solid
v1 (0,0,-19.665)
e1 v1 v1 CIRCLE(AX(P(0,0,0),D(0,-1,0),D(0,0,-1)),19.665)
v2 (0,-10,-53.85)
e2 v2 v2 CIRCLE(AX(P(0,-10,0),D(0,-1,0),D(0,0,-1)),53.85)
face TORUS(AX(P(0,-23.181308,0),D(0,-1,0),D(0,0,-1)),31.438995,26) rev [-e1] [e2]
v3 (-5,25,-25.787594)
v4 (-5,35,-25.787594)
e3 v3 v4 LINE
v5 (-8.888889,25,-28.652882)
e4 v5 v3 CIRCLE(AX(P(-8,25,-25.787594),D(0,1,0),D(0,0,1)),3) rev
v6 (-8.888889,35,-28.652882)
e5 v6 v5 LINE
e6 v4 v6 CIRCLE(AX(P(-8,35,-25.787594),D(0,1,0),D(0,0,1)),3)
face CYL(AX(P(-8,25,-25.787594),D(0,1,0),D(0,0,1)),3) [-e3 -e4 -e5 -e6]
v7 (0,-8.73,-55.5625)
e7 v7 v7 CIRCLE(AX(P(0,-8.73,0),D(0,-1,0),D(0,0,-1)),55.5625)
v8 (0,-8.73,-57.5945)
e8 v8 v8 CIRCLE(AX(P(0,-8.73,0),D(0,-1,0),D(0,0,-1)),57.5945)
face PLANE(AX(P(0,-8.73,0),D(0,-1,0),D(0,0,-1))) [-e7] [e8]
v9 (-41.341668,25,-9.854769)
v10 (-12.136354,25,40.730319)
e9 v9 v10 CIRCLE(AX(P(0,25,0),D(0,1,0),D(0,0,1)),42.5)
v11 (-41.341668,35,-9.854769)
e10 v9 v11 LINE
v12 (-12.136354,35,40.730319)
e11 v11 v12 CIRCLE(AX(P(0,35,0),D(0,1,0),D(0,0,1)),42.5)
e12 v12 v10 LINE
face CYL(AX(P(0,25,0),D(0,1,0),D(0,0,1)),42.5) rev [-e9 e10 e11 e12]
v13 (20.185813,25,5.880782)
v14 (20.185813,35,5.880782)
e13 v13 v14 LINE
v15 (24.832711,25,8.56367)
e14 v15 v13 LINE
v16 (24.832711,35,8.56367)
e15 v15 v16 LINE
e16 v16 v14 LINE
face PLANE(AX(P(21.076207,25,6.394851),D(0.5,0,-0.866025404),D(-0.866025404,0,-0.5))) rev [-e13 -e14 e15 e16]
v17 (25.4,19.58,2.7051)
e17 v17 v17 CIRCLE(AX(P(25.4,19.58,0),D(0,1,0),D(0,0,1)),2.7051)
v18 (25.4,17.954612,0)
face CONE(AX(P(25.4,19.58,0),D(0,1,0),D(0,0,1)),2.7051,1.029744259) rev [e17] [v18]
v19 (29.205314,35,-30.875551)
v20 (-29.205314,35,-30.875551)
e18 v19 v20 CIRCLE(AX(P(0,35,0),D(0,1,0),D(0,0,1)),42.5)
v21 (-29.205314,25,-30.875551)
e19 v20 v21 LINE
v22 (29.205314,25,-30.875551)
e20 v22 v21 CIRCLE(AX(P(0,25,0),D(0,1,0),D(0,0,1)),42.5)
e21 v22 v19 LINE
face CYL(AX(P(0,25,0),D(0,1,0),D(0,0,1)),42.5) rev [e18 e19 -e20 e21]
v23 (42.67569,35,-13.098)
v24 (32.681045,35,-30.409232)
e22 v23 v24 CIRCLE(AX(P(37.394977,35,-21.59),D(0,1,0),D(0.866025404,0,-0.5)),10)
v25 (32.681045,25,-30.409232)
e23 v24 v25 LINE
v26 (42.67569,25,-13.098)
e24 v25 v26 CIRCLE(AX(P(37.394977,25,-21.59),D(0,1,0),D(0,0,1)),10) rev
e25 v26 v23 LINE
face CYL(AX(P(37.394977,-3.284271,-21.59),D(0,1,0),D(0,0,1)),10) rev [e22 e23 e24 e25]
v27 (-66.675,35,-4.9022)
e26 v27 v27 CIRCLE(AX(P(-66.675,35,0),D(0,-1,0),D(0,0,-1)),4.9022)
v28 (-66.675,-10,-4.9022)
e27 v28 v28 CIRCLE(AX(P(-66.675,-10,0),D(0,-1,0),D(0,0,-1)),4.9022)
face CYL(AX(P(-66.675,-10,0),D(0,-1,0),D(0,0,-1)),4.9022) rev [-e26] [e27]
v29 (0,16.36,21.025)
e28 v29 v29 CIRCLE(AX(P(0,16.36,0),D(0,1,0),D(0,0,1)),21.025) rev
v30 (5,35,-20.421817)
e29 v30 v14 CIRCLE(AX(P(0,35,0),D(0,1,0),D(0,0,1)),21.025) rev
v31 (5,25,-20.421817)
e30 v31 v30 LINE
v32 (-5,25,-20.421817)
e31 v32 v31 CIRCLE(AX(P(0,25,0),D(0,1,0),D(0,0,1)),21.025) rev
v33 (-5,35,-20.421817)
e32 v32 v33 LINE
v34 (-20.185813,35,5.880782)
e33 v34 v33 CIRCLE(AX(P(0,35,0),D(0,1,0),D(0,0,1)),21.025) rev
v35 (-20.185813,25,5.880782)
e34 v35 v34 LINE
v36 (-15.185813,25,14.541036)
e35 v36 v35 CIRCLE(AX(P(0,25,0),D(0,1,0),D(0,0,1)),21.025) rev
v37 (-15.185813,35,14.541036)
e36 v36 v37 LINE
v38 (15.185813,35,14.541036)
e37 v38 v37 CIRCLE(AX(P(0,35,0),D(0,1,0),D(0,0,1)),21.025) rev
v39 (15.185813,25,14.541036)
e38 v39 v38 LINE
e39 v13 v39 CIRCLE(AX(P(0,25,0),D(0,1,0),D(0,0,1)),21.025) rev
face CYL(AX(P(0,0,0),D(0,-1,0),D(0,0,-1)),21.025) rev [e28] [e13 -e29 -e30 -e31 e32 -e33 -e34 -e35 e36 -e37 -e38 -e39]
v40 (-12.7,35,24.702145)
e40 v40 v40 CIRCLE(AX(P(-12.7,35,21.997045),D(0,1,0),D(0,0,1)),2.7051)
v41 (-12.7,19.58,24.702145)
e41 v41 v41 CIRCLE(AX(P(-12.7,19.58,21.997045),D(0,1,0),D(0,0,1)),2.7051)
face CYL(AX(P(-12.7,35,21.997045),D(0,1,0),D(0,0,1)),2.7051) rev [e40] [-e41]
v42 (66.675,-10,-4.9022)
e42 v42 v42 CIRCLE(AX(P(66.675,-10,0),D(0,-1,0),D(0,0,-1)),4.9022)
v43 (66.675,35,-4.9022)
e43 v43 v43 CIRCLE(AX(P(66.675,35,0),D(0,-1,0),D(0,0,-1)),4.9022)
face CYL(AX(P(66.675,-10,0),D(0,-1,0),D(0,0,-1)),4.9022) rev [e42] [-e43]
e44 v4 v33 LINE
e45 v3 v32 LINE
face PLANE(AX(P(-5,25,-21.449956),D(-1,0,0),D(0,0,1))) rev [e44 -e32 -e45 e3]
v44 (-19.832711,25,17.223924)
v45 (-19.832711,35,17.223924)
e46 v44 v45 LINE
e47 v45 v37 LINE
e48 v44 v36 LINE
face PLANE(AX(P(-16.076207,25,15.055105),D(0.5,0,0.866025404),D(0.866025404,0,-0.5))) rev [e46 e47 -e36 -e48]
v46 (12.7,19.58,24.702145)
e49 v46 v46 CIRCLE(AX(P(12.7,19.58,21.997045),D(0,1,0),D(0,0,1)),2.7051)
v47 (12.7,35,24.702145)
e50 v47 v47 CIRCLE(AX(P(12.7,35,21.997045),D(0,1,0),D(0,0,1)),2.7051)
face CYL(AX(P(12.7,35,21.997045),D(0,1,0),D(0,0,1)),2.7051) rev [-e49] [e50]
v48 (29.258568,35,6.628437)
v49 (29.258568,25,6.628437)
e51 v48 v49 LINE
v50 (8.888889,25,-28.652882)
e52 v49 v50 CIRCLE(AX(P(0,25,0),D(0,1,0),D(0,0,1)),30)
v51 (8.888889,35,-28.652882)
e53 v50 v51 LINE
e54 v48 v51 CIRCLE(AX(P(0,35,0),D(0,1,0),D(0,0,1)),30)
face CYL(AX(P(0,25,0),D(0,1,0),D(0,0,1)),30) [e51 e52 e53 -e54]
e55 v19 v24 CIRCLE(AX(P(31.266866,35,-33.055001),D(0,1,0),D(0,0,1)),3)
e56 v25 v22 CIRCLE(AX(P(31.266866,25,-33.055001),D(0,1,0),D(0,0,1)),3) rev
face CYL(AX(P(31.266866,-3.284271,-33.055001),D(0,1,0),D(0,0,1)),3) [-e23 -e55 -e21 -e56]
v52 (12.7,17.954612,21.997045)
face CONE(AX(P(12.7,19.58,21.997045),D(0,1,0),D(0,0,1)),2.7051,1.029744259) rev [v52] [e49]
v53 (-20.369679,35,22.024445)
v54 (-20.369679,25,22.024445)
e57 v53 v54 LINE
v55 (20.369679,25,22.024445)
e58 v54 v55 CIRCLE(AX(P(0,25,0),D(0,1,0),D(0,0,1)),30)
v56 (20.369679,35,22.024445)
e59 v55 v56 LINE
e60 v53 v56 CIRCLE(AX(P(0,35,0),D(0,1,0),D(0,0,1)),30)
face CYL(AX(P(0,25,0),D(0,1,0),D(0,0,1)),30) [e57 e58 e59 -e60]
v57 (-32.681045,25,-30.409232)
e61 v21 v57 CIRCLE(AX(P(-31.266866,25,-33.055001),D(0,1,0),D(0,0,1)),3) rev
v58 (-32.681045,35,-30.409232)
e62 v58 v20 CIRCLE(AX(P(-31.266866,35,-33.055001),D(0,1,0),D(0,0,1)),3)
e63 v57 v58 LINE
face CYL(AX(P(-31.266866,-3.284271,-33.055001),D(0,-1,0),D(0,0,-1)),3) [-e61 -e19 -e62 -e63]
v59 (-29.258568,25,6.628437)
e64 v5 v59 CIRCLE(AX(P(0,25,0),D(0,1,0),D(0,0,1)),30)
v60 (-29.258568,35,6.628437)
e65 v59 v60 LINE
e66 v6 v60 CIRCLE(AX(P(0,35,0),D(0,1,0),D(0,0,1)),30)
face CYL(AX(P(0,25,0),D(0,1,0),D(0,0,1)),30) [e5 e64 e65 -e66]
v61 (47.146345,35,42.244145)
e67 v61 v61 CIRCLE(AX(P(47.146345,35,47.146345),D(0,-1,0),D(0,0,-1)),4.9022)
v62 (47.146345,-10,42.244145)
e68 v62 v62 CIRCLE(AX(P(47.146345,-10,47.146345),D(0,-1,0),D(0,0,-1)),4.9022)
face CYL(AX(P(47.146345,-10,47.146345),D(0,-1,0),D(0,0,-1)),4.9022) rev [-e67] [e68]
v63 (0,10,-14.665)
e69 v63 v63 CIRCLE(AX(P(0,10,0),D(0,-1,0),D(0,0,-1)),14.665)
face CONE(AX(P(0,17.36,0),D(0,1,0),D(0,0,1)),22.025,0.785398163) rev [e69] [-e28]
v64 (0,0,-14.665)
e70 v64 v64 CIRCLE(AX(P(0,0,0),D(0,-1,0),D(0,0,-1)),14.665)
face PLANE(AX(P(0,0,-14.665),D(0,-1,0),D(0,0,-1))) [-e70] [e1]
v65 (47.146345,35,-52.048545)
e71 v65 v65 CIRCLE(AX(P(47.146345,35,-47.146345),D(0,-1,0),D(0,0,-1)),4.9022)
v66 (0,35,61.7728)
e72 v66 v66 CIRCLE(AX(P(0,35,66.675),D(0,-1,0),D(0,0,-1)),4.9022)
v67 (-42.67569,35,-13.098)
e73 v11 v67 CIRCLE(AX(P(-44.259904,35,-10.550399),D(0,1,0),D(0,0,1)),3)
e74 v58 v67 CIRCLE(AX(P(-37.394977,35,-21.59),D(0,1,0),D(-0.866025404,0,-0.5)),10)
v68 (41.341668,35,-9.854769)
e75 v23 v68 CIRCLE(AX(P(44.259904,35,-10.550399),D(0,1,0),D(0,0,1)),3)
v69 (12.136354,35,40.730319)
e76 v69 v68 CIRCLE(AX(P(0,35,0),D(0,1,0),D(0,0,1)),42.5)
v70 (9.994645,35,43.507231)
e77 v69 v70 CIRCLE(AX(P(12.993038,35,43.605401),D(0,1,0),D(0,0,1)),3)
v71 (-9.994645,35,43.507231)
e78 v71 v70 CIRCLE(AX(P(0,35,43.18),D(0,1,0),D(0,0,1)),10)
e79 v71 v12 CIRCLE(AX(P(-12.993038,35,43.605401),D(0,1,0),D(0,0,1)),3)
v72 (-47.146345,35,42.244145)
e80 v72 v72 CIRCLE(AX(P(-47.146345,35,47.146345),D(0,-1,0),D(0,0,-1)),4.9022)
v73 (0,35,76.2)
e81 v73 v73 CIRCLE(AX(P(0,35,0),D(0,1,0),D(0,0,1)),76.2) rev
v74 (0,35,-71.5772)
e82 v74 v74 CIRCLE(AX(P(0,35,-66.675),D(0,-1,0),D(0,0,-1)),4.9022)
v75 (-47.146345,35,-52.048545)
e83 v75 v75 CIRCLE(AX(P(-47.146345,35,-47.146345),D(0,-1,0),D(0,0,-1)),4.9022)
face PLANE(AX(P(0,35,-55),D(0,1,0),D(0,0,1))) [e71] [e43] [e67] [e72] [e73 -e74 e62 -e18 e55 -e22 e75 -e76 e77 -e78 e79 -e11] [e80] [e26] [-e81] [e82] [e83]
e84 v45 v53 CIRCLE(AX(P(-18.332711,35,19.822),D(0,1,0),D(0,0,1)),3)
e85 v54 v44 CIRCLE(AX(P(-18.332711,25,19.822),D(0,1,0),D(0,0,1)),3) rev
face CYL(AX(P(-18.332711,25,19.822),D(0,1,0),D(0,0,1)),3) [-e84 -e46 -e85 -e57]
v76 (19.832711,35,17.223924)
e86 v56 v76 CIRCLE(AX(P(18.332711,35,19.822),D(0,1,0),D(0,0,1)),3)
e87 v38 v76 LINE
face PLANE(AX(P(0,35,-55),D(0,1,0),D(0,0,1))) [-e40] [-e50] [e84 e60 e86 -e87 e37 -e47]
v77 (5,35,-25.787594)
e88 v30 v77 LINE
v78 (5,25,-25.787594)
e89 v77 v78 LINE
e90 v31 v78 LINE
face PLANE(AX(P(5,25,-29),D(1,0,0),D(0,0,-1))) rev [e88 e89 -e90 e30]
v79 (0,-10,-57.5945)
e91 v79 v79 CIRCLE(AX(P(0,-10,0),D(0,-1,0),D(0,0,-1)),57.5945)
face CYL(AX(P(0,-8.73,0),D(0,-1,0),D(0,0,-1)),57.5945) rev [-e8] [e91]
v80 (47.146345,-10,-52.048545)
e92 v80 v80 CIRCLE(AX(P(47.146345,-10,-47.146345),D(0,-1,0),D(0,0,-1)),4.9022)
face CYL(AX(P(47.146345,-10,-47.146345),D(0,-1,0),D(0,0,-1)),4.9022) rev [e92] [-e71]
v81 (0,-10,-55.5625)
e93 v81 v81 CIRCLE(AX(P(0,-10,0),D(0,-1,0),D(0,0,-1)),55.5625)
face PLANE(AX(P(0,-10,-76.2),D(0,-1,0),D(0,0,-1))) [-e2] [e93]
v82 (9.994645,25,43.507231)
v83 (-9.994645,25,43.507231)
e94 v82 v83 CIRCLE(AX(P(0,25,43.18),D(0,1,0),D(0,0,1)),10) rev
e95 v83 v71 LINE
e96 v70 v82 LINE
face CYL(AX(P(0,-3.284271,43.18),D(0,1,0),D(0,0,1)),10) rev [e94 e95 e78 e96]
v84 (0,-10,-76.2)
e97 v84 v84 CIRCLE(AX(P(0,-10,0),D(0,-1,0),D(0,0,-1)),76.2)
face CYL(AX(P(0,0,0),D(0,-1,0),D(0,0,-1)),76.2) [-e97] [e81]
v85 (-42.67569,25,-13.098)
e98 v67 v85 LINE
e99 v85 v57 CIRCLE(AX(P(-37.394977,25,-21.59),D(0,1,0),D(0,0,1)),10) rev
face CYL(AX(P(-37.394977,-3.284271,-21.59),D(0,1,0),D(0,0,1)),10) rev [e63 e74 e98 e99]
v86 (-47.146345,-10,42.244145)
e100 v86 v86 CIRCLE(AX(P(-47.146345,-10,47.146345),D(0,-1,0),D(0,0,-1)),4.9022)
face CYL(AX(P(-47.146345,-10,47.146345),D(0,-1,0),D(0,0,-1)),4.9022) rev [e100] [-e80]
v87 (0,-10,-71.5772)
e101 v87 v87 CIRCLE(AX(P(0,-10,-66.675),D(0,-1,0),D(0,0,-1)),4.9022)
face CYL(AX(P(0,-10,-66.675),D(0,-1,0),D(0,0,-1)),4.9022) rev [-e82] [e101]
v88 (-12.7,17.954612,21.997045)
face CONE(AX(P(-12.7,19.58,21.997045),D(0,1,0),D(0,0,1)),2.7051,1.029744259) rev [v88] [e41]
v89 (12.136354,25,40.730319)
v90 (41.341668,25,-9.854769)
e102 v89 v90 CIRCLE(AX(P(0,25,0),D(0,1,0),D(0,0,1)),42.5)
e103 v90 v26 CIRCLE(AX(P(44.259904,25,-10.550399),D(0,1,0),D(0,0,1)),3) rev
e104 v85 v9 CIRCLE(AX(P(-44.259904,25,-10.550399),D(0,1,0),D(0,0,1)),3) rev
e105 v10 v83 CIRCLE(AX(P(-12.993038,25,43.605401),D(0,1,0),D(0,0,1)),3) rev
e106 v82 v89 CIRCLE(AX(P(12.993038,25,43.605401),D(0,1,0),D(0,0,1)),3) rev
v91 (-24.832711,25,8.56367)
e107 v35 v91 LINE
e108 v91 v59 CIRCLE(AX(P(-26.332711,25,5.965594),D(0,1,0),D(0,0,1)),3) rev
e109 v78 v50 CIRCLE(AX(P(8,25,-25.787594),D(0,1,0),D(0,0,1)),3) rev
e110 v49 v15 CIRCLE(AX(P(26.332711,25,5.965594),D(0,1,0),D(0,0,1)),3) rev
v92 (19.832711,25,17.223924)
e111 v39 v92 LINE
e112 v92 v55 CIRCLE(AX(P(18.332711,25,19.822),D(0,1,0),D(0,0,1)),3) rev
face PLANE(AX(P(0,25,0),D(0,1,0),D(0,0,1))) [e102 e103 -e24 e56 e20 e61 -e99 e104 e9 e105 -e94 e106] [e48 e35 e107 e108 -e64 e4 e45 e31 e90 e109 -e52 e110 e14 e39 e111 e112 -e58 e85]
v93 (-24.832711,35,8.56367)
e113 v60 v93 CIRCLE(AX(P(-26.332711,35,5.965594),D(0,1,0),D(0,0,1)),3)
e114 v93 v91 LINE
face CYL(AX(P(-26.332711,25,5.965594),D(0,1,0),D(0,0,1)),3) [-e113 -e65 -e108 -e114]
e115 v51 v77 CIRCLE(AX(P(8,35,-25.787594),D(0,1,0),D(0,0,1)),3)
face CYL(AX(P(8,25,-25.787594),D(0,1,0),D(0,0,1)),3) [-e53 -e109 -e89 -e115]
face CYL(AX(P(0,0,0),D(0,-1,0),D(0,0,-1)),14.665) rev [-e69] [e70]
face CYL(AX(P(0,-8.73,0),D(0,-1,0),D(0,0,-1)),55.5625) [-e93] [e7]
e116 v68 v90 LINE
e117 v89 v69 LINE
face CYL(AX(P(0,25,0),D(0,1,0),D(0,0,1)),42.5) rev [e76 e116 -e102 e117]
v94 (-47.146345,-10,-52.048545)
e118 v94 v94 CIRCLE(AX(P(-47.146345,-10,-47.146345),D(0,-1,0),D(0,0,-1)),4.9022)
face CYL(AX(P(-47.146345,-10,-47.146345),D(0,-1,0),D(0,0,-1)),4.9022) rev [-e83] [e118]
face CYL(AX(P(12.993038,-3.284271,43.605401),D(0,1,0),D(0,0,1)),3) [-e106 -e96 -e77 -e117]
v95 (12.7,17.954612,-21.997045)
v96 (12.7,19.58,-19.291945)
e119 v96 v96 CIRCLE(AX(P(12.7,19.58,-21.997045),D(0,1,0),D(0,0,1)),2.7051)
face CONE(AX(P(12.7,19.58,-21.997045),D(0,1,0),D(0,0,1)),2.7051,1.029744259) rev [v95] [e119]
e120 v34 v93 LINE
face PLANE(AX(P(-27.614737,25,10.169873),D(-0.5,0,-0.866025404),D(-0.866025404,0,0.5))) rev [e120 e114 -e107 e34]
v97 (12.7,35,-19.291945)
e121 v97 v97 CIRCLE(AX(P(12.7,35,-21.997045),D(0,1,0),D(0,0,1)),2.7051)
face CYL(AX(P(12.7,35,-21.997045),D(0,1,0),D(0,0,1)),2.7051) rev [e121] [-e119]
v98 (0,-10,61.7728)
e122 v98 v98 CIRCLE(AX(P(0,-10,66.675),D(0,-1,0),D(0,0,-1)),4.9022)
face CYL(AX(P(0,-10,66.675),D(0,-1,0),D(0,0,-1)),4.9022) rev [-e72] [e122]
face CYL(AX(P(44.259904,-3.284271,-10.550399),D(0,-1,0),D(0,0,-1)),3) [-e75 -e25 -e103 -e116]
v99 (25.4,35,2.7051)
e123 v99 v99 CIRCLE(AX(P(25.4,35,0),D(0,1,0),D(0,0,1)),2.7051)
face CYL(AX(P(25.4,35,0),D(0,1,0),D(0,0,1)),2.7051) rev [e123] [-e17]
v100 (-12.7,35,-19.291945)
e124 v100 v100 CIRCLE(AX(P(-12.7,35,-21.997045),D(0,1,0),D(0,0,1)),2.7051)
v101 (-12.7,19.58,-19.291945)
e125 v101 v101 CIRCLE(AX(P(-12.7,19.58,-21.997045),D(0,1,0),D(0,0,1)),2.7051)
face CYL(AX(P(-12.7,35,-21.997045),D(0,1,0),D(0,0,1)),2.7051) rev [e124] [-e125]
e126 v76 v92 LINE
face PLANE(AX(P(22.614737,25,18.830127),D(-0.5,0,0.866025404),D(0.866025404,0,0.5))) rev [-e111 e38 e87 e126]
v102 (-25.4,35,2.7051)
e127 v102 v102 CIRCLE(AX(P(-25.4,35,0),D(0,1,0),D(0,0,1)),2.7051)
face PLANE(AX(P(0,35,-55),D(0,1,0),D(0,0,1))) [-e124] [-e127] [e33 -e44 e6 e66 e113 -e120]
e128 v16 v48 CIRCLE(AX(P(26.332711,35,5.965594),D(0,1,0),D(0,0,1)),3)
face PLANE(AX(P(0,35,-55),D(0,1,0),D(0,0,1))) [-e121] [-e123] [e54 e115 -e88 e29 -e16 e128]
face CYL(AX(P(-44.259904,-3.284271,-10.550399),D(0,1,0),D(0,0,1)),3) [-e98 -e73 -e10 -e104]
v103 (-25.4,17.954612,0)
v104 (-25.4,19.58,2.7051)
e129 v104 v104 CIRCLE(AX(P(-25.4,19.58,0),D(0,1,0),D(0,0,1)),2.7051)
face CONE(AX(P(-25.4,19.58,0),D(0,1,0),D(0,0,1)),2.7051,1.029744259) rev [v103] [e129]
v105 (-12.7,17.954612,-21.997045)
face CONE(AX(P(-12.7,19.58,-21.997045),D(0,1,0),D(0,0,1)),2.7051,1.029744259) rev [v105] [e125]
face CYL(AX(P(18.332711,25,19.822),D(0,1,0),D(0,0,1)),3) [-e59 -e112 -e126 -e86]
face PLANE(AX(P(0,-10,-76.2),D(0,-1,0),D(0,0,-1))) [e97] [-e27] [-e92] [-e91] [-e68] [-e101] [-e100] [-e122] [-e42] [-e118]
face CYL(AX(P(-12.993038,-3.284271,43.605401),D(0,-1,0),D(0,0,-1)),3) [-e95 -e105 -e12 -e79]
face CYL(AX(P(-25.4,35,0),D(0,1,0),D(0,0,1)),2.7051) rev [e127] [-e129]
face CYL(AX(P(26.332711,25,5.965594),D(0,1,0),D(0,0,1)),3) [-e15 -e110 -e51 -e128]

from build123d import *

# Parameters (mm, degrees)
SKETCH6_R                   = 42.5
SKETCH6_R_2                 = 29
CUT_EXTRUDE3_DEPTH          = 10
CUT_EXTRUDE4_DEPTH          = 10
CIRPATTERN2_COUNT           = 3
DELETEFACE1_START           = 15
DELETEFACE1_OUTLINE_R       = 76.2
DELETEFACE1_OUTLINE_R_2     = 55
DELETEFACE1_DEPTH           = 20
F_3_8_CLEARANCE_HOLE1_D     = 9.8044
SKETCH46_R                  = 10.000000000000007
CUT_EXTRUDE5_DEPTH          = 10
CIRPATTERN6_COUNT           = 3
SKETCH54_R                  = 57.5945
SKETCH54_R_2                = 55.56250000000001
CUT_EXTRUDE6_DEPTH          = 1.27
MOVE_START                  = 16.3599999
MOVE_FACE1_DEPTH            = 18.6400001
MOVE_FACE1_2_DEPTH          = 8.6400001
F_1_4_28_TAPPED_HOLE1_D     = 5.4102
F_1_4_28_TAPPED_HOLE1_DEPTH = 15.42
F_1_4_28_TAPPED_HOLE1_TIP   = 1.6253880605314532
FILLET2_R                   = 3


# Read off the part's stored shape, not the designer's step: DeleteFace1, Move Face1
with BuildPart() as part:
    # Sketch3 → Revolve1 (revolve)
    with BuildSketch(Plane(origin=(0, 0, 0), x_dir=(0, 0, -1), z_dir=(1, 0, 0))):
        with BuildLine():
            Line((76.2, 15.000000000000002), (55, 14.999999999999998))
            Line((55, 14.999999999999998), (55, 34.99999999999999))
            Line((55, 34.99999999999999), (22.024999999999995, 34.99999999999999))
            Line((22.024999999999995, 34.99999999999999), (22.024999999999995, 17.360000000000028))
            Line((22.024999999999995, 17.360000000000028), (14.665, 10))
            Line((14.665, 10), (14.665, 0))
            Line((14.665, 0), (19.665, 0))
            ThreePointArc((19.665, 0), (38.73875508023388, 1.7729204917795123), (53.85, -10.000000000000004))
            Line((53.85, -10.000000000000004), (76.2, -10))
            Line((76.2, -10), (76.2, 15.000000000000002))
        make_face()
    revolve(axis=Axis((0, 0, 0), (0, 1, 0)))

    # Sketch6 → Cut-Extrude3 (cut)
    with BuildSketch(Plane(origin=(0, 34.99999999999999, 0), x_dir=(1, 0, 0), z_dir=(0, 1, 0))):
        with Locations(Location((0, 0, 0), (0, 0, 270))):
            Circle(SKETCH6_R)
        with Locations(Location((0, 0, 0), (0, 0, 270))):
            Circle(SKETCH6_R_2, mode=Mode.SUBTRACT)
    extrude(amount=-CUT_EXTRUDE3_DEPTH, mode=Mode.SUBTRACT)

    # Sketch7 → Cut-Extrude4 (cut)
    with BuildSketch(Plane(origin=(0, 34.99999999999999, 0), x_dir=(1, 0, 0), z_dir=(0, 1, 0))):
        Polygon((-4.999999999999999, 29), (5.000000000000001, 29.000000000000004), (5.000000000000005, 21.44995629366177), (-5, 21.449956293661767), align=None)
    cut_extrude4 = extrude(amount=-CUT_EXTRUDE4_DEPTH, mode=Mode.SUBTRACT)

    # CirPattern2: Cut-Extrude4 ×3 about axis
    cirpattern2_axis = Axis((2.9e-16, 0, 0), (0, 1, 0))
    for i in range(1, CIRPATTERN2_COUNT):
        add(cut_extrude4.rotate(cirpattern2_axis, i * 360 / CIRPATTERN2_COUNT), mode=Mode.SUBTRACT)

    # DeleteFace1 outline → DeleteFace1 (add)
    with BuildSketch(Plane(origin=(0, 0, 0), x_dir=(1, 0, 0), z_dir=(0, 1, 0)).offset(DELETEFACE1_START)):
        Circle(DELETEFACE1_OUTLINE_R)
        Circle(DELETEFACE1_OUTLINE_R_2, mode=Mode.SUBTRACT)
    extrude(amount=DELETEFACE1_DEPTH)

    # 3/8 Clearance Hole1 (through all)
    with Locations(Plane(origin=(0, -10.000000000000002, 0), x_dir=(-1, 0, 0), z_dir=(0, -1, 0))):
        with Locations((-47.146344636, 47.146344636), (-66.675, 0), (-47.146344636, -47.146344636), (0, -66.675), (47.146344636, -47.146344636), (66.675, 0), (47.146344636, 47.146344636), (0, 66.675)):
            Hole(F_3_8_CLEARANCE_HOLE1_D / 2)

    # Sketch46 → Cut-Extrude5 (cut)
    with BuildSketch(Plane(origin=(0, 34.99999999999999, 0), x_dir=(1, 0, 0), z_dir=(0, 1, 0))):
        with Locations((0, -43.17999999999999)):
            Circle(SKETCH46_R)
    cut_extrude5 = extrude(amount=-CUT_EXTRUDE5_DEPTH, mode=Mode.SUBTRACT)

    # CirPattern6: Cut-Extrude5 ×3 about axis
    cirpattern6_axis = Axis((2.97e-15, 0, -2.87e-15), (0, 1, 0))
    for i in range(1, CIRPATTERN6_COUNT):
        add(cut_extrude5.rotate(cirpattern6_axis, i * 360 / CIRPATTERN6_COUNT), mode=Mode.SUBTRACT)

    # Sketch54 → Cut-Extrude6 (cut)
    with BuildSketch(Plane.XZ.offset(10.000000000000002)):
        with Locations(Location((1.9421e-13, 2e-17, 0), (0, 0, 270))):
            Circle(SKETCH54_R)
        with Locations(Location((1.9421e-13, 2e-17, 0), (0, 0, 270))):
            Circle(SKETCH54_R_2, mode=Mode.SUBTRACT)
    extrude(amount=-CUT_EXTRUDE6_DEPTH, mode=Mode.SUBTRACT)

    # Move Face1 outline → Move Face1 (add)
    with BuildSketch(Plane(origin=(0, 0, 0), x_dir=(1, 0, 0), z_dir=(0, 1, 0)).offset(MOVE_START)):
        with BuildLine():
            Line((27.238633754, -9.952729838), (28.117376915, -10.460072439))
            ThreePointArc((28.117376915, -10.460072439), (25.980762114, 15), (5, 29.580398915))
            Line((5, 29.580398915), (5, 28.565713714))
            ThreePointArc((5, 28.565713714), (25.11473671, 14.5), (27.238633754, -9.952729838))
        make_face()
        with BuildLine():
            Line((20.18581264, -5.88078167), (21.07620706, -6.394851128))
            ThreePointArc((21.07620706, -6.394851128), (19.074209518, 11.0125), (5, 21.449956294))
            Line((5, 21.449956294), (5, 20.421817378))
            ThreePointArc((5, 20.421817378), (18.208184115, 10.5125), (20.18581264, -5.88078167))
        make_face()
        with BuildLine():
            ThreePointArc((-16.07620706, -15.055105166), (0, -22.025), (16.07620706, -15.055105166))
            Line((16.07620706, -15.055105166), (15.18581264, -14.541035708))
            ThreePointArc((15.18581264, -14.541035708), (0, -21.025), (-15.18581264, -14.541035708))
            Line((-15.18581264, -14.541035708), (-16.07620706, -15.055105166))
        make_face()
        with BuildLine():
            Line((-5, 20.421817378), (-5, 21.449956294))
            ThreePointArc((-5, 21.449956294), (-19.074209518, 11.0125), (-21.07620706, -6.394851128))
            Line((-21.07620706, -6.394851128), (-20.18581264, -5.88078167))
            ThreePointArc((-20.18581264, -5.88078167), (-18.208184115, 10.5125), (-5, 20.421817378))
        make_face()
        with BuildLine():
            Line((23.117376915, -19.120326477), (22.238633754, -18.612983876))
            ThreePointArc((22.238633754, -18.612983876), (0, -29), (-22.238633754, -18.612983876))
            Line((-22.238633754, -18.612983876), (-23.117376915, -19.120326477))
            ThreePointArc((-23.117376915, -19.120326477), (0, -30), (23.117376915, -19.120326477))
        make_face()
        with BuildLine():
            ThreePointArc((-27.238633754, -9.952729838), (-25.11473671, 14.5), (-5, 28.565713714))
            Line((-5, 28.565713714), (-5, 29.580398915))
            ThreePointArc((-5, 29.580398915), (-25.980762114, 15), (-28.117376915, -10.460072439))
            Line((-28.117376915, -10.460072439), (-27.238633754, -9.952729838))
        make_face()
    extrude(amount=MOVE_FACE1_DEPTH)

    # Move Face1 2 outline → Move Face1 2 (add)
    with BuildSketch(Plane(origin=(0, 0, 0), x_dir=(1, 0, 0), z_dir=(0, 1, 0)).offset(MOVE_START)):
        with BuildLine():
            ThreePointArc((16.07620706, -15.055105166), (19.074209518, -11.0125), (21.07620706, -6.394851128))
            Line((21.07620706, -6.394851128), (20.18581264, -5.88078167))
            ThreePointArc((20.18581264, -5.88078167), (18.208184114, -10.5125), (15.18581264, -14.541035708))
            Line((15.18581264, -14.541035708), (16.07620706, -15.055105166))
        make_face()
        with BuildLine():
            Line((5, 20.421817378), (5, 21.449956294))
            ThreePointArc((5, 21.449956294), (0, 22.025), (-5, 21.449956294))
            Line((-5, 21.449956294), (-5, 20.421817378))
            ThreePointArc((-5, 20.421817378), (0, 21.025), (5, 20.421817378))
        make_face()
        with BuildLine():
            ThreePointArc((-21.07620706, -6.394851128), (-19.074209518, -11.0125), (-16.07620706, -15.055105166))
            Line((-16.07620706, -15.055105166), (-15.18581264, -14.541035708))
            ThreePointArc((-15.18581264, -14.541035708), (-18.208184114, -10.5125), (-20.18581264, -5.88078167))
            Line((-20.18581264, -5.88078167), (-21.07620706, -6.394851128))
        make_face()
    extrude(amount=MOVE_FACE1_2_DEPTH)

    # 1/4-28 Tapped Hole1
    with Locations(Plane(origin=(0, 34.99999999999999, 0), x_dir=(1, 0, 0), z_dir=(0, 1, 0))):
        with Locations((12.7, -21.997045256), (25.4, 0), (12.7, 21.997045256), (-12.7, 21.997045256), (-25.4, 0), (-12.7, -21.997045256)):
            Hole(F_1_4_28_TAPPED_HOLE1_D / 2, depth=F_1_4_28_TAPPED_HOLE1_DEPTH)
            with Locations((0, 0, -(F_1_4_28_TAPPED_HOLE1_DEPTH + F_1_4_28_TAPPED_HOLE1_TIP / 2))):  # 118° drill point
                Cone(0, F_1_4_28_TAPPED_HOLE1_D / 2, F_1_4_28_TAPPED_HOLE1_TIP, mode=Mode.SUBTRACT)

    # Fillet2
    # the kernel refuses this fillet: 3 mm, written as the material it takes off along each edge
    with BuildSketch(Plane(origin=(9.830646823307555, 24.999999999999993, 41.34741083835109), x_dir=(0.9660012872655641, 0, -0.2585372565052729), z_dir=(0, 1, 0))) as fillet2_piece_1:
        with BuildLine():
            CenterArc((2.4710993757232056, -2.99881698030462), FILLET2_R, 91.60911566596931, 71.53236669555653)
            ThreePointArc((-0.399972032548426, -2.1287888378832687), (-0.1421780421624502, -1.075255793490215), (0, 0))
            ThreePointArc((0, 0), (1.193428675775411, -0.0167594456845017), (2.386857351550826, 1e-16))
        make_face()
    extrude(amount=15.967143378877061, mode=Mode.SUBTRACT)
    with BuildSketch(Plane(origin=(-9.830646823307555, 24.999999999999993, 41.34741083835109), x_dir=(-0.9660012872655644, 0, -0.2585372565052715), z_dir=(0, 1, 0))) as fillet2_piece_2:
        with BuildLine():
            CenterArc((2.471099375723227, 2.9988169803046207), FILLET2_R, 196.85851763847407, 71.53236669555645)
            ThreePointArc((-0.3999720325484057, 2.1287888378832736), (-0.14217804216245042, 1.075255793490222), (0, 0))
            ThreePointArc((0, 0), (1.1934286757754193, 0.01675944568450221), (2.386857351550839, 2e-17))
        make_face()
    extrude(amount=15.967143378877097, mode=Mode.SUBTRACT)
    with BuildSketch(Plane(origin=(30.892584755070303, 24.999999999999993, -29.18729530379268), x_dir=(0.8256829754273846, 0, -0.5641344025047409), z_dir=(0, 1, 0))) as fillet2_piece_3:
        with BuildLine():
            CenterArc((2.490943414807226, 2.9823541557433946), FILLET2_R, 192.25019723269426, 71.53236669558856)
            ThreePointArc((-0.4407477133877039, 2.345811047334284), (-0.20390261981452568, 1.1760002571493982), (0, 0))
            ThreePointArc((0, 0), (1.0830188760031507, 0.05881948085535766), (2.1660377520062934, -7e-17))
        make_face()
    extrude(amount=15.967143378876976, mode=Mode.SUBTRACT)
    with BuildSketch(Plane(origin=(40.72323157837786, 24.999999999999993, -12.160115534558376), x_dir=(0.25910081167448135, 0, 0.9658502831130842), z_dir=(0, 1, 0))) as fillet2_piece_4:
        with BuildLine():
            CenterArc((2.471099375723175, 2.998816980304626), FILLET2_R, 196.85851763847427, 71.53236669555645)
            ThreePointArc((-0.39997203254845776, 2.1287888378832673), (-0.14217804216247343, 1.0752557934902138), (0, 0))
            ThreePointArc((0, 0), (1.1934286757754016, 0.01675944568450463), (2.3868573515507956, -2e-17))
        make_face()
    extrude(amount=15.96714337887699, mode=Mode.SUBTRACT)
    with BuildSketch(Plane(origin=(-40.72323157837785, 24.999999999999993, -12.160115534558436), x_dir=(-0.9013962114315556, 0, -0.43299523094006276), z_dir=(0, 1, 0))) as fillet2_piece_5:
        with BuildLine():
            CenterArc((2.49094341480725, 2.982354155743391), FILLET2_R, 192.2501972326937, 71.53236669558873)
            ThreePointArc((-0.4407477133876857, 2.3458110473343083), (-0.20390261981451535, 1.1760002571494013), (0, 0))
            ThreePointArc((0, 0), (1.0830188760031414, 0.0588194808553639), (2.1660377520062966, -6e-17))
        make_face()
    extrude(amount=15.967143378877033, mode=Mode.SUBTRACT)
    with BuildSketch(Plane(origin=(-30.892584755070274, 24.999999999999993, -29.187295303792705), x_dir=(0.7069004755910809, 0, -0.7073130266078123), z_dir=(0, 1, 0))) as fillet2_piece_6:
        with BuildLine():
            CenterArc((2.4710993757232096, 2.9988169803046243), FILLET2_R, 196.85851763847404, 71.53236669555645)
            ThreePointArc((-0.3999720325484262, 2.1287888378832767), (-0.14217804216245522, 1.0752557934902165), (0, 0))
            ThreePointArc((0, 0), (1.1934286757754182, 0.01675944568449942), (2.3868573515508196, -1.8e-16))
        make_face()
    extrude(amount=15.967143378877047, mode=Mode.SUBTRACT)
    with BuildSketch(Plane(origin=(5.000000000000002, 24.999999999999993, -29.580398915), x_dir=(0.9727164823489909, 0, 0.2319970796510279), z_dir=(0, 1, 0))) as fillet2_piece_7:
        with BuildLine():
            CenterArc((3.7980691304680256, -2.9933326977725025), FILLET2_R, 86.17939148491388, 107.23528525435825)
            Line((0.879919683421053, -3.6893239367255863), (0, 0))
            ThreePointArc((0, 0), (1.9989837528820262, 0.06667302227236113), (3.997967505764053, -4e-17))
        make_face()
    extrude(amount=19.994918764410137, mode=Mode.SUBTRACT)
    with BuildSketch(Plane(origin=(-5, 24.999999999999993, -29.580398915000004), x_dir=(0, 0, 1), z_dir=(0, 1, 0))) as fillet2_piece_8:
        with BuildLine():
            CenterArc((3.7928049988587844, -3), FILLET2_R, 90, 107.23528525435827)
            ThreePointArc((0.9275167858769642, -3.888888888752385), (0.398904445246135, -1.9599123908348863), (0, 0))
            Line((0, 0), (3.7928049988587844, 0))
        make_face()
    extrude(amount=19.99491876441016, mode=Mode.SUBTRACT)
    with BuildSketch(Plane(origin=(28.117376915, 24.999999999999993, 10.460072439), x_dir=(-0.8660254035932116, 0, -0.500000000331215), z_dir=(0, 1, 0))) as fillet2_piece_9:
        with BuildLine():
            CenterArc((3.7928050005013083, -2.9999999999999996), FILLET2_R, 90.00000000000003, 107.23528528020469)
            ThreePointArc((0.927516787920472, -3.8888888900449325), (0.39890444621818144, -1.959912391521957), (0, 0))
            Line((0, 0), (3.7928050005013074, 8e-17))
        make_face()
    extrude(amount=19.99491876873858, mode=Mode.SUBTRACT)
    with BuildSketch(Plane(origin=(23.117376915000005, 24.999999999999993, 19.120326477), x_dir=(-0.6872736057892516, 0, 0.7263986445371717), z_dir=(0, 1, 0))) as fillet2_piece_10:
        with BuildLine():
            CenterArc((3.798069129156114, -2.9933326977780332), FILLET2_R, 86.17939148649958, 107.2352852334754)
            Line((0.8799196818747332, -3.689323935748289), (0, 0))
            ThreePointArc((0, 0), (1.9989837521846505, 0.06667302222141196), (3.997967504369298, 1.1e-16))
        make_face()
    extrude(amount=19.994918760923248, mode=Mode.SUBTRACT)
    with BuildSketch(Plane(origin=(-23.117376915, 24.999999999999993, 19.120326477000003), x_dir=(0.8660254035932119, 0, -0.5000000003312144), z_dir=(0, 1, 0))) as fillet2_piece_11:
        with BuildLine():
            CenterArc((3.7928049975494087, -3.0000000000000004), FILLET2_R, 89.99999999999994, 107.23528523347551)
            ThreePointArc((0.9275167842436107, -3.888888887708064), (0.3989044444738124, -1.959912390279063), (0, 0))
            Line((0, 0), (3.7928049975494114, 3.1e-16))
        make_face()
    extrude(amount=19.994918760923248, mode=Mode.SUBTRACT)
    with BuildSketch(Plane(origin=(-28.117376915, 24.999999999999993, 10.460072438999998), x_dir=(-0.28544287655482414, 0, -0.9583957242309189), z_dir=(0, 1, 0))) as fillet2_piece_12:
        with BuildLine():
            CenterArc((3.798069132112833, -2.993332697766721), FILLET2_R, 86.17939148325686, 107.23528528020466)
            Line((0.8799196853596981, -3.6893239379518032), (0, 0))
            ThreePointArc((0, 0), (1.9989837537477129, 0.06667302233017942), (3.997967507495428, 8e-17))
        make_face()
    extrude(amount=19.99491876873858, mode=Mode.SUBTRACT)


solid = part.part
